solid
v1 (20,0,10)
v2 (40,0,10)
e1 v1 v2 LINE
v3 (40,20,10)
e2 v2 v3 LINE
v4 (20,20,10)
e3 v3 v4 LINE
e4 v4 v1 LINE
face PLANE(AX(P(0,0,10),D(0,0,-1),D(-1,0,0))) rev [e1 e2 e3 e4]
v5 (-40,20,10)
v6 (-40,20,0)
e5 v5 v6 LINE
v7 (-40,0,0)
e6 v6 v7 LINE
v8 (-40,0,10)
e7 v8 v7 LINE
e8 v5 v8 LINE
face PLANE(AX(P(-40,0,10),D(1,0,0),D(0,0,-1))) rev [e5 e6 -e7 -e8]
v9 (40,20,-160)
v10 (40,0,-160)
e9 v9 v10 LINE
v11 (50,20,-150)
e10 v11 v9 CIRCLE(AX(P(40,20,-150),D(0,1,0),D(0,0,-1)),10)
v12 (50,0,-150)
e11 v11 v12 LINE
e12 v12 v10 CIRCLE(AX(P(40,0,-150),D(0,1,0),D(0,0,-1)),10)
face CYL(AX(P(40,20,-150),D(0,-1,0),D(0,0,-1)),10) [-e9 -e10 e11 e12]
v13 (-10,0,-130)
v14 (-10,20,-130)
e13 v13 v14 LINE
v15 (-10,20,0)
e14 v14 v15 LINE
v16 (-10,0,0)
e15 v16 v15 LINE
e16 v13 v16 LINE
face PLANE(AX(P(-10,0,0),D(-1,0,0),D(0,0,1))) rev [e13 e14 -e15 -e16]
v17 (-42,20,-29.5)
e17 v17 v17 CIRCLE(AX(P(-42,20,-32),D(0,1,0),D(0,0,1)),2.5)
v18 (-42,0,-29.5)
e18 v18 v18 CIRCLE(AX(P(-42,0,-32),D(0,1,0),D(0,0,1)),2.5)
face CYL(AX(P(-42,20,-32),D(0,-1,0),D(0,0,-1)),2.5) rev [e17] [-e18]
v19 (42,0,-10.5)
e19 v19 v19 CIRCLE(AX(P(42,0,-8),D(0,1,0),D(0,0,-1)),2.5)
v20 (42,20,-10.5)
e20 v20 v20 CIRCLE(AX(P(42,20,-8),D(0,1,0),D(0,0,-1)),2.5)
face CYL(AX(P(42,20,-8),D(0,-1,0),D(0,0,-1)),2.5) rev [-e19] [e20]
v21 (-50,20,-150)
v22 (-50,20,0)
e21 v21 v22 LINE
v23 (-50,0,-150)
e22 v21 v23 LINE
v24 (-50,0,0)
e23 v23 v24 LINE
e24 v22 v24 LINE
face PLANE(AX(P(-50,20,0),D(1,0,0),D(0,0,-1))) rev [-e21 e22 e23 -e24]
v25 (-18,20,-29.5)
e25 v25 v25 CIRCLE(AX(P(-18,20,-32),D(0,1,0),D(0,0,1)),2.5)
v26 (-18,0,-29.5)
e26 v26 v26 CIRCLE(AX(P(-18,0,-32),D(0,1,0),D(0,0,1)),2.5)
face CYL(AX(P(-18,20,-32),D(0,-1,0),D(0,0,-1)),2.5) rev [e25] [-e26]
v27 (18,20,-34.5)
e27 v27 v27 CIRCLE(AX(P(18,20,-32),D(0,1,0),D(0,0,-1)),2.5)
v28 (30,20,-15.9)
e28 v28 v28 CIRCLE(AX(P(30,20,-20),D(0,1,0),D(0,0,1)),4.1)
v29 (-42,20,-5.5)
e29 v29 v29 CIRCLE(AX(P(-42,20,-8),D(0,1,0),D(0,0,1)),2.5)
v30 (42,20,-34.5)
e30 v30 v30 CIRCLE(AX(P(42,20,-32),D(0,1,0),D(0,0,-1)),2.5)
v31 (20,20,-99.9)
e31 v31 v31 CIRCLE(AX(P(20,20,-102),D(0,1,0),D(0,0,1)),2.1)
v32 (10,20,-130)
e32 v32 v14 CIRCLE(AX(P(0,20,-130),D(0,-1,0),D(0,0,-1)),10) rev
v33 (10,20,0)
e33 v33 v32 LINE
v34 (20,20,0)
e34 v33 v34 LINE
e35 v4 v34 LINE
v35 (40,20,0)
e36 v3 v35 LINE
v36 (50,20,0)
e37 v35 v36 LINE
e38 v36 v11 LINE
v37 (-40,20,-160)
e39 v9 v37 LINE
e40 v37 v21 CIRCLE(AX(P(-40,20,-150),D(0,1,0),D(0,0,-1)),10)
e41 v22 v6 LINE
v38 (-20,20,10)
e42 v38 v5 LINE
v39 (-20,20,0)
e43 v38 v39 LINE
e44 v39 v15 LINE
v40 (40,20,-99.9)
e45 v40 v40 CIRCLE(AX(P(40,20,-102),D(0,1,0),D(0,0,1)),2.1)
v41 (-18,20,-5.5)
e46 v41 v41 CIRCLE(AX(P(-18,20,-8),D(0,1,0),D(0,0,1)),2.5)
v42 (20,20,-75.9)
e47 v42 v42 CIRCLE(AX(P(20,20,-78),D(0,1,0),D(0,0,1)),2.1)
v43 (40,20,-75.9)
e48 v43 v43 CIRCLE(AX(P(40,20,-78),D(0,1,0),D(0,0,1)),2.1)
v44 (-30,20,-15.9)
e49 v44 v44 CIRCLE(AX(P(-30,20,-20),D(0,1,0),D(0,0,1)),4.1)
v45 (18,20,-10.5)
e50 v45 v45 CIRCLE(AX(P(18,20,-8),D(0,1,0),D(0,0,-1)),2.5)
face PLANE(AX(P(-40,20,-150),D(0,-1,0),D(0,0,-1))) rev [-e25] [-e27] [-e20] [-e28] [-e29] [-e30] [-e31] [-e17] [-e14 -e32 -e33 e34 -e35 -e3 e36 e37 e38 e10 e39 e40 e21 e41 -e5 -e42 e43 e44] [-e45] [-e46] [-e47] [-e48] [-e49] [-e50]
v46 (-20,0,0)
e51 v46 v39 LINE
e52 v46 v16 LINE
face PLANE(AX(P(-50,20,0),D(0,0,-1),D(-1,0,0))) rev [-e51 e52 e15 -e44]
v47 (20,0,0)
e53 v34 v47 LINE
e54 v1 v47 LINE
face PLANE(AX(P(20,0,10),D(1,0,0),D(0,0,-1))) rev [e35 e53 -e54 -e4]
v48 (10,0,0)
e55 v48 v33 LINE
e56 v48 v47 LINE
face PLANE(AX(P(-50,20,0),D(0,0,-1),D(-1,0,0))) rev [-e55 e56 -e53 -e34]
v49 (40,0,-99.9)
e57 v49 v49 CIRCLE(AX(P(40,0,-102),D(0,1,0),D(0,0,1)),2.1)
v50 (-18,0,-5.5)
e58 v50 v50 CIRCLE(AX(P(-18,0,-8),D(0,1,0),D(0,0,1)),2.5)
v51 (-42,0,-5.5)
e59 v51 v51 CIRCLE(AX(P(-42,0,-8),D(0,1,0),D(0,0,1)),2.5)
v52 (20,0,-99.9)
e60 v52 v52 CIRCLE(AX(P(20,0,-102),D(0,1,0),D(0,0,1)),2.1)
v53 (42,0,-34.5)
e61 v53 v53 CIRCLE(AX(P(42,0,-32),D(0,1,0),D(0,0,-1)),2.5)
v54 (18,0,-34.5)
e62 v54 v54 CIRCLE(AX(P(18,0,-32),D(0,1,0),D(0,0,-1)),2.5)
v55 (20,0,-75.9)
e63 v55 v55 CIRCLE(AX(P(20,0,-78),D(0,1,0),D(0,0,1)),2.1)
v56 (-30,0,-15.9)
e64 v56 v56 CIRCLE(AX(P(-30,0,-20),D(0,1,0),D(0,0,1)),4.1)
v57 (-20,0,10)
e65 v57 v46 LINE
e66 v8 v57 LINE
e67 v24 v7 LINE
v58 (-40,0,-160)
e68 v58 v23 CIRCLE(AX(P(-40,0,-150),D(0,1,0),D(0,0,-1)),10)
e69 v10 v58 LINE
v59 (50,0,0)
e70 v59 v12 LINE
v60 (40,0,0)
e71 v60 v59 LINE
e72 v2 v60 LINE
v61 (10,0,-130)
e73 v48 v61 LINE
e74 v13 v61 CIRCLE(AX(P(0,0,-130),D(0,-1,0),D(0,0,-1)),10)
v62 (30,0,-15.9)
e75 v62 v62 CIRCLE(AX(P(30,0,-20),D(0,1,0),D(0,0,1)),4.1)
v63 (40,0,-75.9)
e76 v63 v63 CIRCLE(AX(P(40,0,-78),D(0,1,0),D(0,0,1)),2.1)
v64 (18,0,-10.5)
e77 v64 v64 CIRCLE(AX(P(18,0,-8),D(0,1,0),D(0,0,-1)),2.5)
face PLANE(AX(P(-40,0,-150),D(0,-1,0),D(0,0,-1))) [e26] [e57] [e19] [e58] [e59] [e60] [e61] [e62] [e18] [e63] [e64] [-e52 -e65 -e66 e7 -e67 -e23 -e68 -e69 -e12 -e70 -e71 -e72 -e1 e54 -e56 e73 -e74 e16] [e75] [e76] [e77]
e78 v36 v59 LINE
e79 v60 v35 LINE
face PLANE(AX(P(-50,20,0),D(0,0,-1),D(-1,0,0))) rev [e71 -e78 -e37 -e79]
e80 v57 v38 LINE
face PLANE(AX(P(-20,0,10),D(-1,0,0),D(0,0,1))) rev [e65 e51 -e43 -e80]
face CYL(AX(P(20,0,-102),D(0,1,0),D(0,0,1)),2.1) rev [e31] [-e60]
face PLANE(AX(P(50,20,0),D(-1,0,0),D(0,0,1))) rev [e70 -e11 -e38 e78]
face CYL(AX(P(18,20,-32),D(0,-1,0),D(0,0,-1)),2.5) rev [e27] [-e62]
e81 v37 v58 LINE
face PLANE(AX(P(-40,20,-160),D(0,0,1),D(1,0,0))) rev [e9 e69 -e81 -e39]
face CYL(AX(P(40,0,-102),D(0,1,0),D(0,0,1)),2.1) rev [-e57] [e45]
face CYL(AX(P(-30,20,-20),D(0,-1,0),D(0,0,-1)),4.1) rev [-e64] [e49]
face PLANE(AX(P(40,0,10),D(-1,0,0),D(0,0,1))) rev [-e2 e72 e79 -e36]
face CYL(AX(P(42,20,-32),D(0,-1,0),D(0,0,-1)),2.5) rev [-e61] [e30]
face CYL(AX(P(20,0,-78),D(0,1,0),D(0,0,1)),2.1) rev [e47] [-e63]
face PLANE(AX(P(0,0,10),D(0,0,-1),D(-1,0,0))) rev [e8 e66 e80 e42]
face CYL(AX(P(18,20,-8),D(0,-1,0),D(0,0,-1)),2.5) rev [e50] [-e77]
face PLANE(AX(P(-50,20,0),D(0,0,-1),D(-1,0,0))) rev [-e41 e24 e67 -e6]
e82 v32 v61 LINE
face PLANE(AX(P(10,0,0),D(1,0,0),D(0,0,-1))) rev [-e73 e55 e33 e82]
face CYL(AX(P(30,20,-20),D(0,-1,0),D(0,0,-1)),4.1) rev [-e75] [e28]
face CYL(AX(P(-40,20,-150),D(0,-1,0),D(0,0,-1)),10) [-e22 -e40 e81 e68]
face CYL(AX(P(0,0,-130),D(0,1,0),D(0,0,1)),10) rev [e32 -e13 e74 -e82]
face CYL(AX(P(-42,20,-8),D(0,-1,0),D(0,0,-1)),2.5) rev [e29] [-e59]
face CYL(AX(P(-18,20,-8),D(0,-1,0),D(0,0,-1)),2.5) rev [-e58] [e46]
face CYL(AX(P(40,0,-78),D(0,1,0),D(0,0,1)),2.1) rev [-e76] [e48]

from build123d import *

# Parameters (mm, degrees)
SKETCH_1_R          = 4.1
SKETCH_1_R_2        = 2.5
EXTRUDE_1_DEPTH     = 20
SKETCH_2_W          = 20
SKETCH_2_H          = 140
CUT_EXTRUDE_1_DEPTH = 169.819430161
FILLET_1_R          = 10
SKETCH_3_W          = 20
SKETCH_3_H          = 20
EXTRUDE_2_DEPTH     = 10
SKETCH_4_W          = 20
SKETCH_4_H          = 20
EXTRUDE_3_DEPTH     = 10
SKETCH_5_R          = 2.1
CUT_EXTRUDE_2_DEPTH = 169.819430161


with BuildPart() as part:
    # ｽｹｯﾁ1 → ﾎﾞｽ - 押し出し1 (new body)
    with BuildSketch(Plane(origin=(0, 0, 0), x_dir=(1, 0, 0), z_dir=(0, 1, 0))):
        with BuildLine():
            Line((-50, 0), (50, 0))
            Line((50, 0), (50, 150))
            ThreePointArc((50, 150), (47.071067812, 157.071067812), (40, 160))
            Line((40, 160), (-40, 160))
            ThreePointArc((-40, 160), (-47.071067812, 157.071067812), (-50, 150))
            Line((-50, 150), (-50, 0))
        make_face()
        with Locations(Location((-30, 20, 0), (0, 0, 270))):
            Circle(SKETCH_1_R, mode=Mode.SUBTRACT)
        with Locations(Location((30, 20, 0), (0, 0, 270))):
            Circle(SKETCH_1_R, mode=Mode.SUBTRACT)
        with Locations(Location((-42, 32, 0), (0, 0, 270))):
            Circle(SKETCH_1_R_2, mode=Mode.SUBTRACT)
        with Locations(Location((-18, 32, 0), (0, 0, 270))):
            Circle(SKETCH_1_R_2, mode=Mode.SUBTRACT)
        with Locations(Location((-18, 8, 0), (0, 0, 270))):
            Circle(SKETCH_1_R_2, mode=Mode.SUBTRACT)
        with Locations(Location((-42, 8, 0), (0, 0, 270))):
            Circle(SKETCH_1_R_2, mode=Mode.SUBTRACT)
        with Locations(Location((18, 32, 0), (0, 0, 90))):
            Circle(SKETCH_1_R_2, mode=Mode.SUBTRACT)
        with Locations(Location((18, 8, 0), (0, 0, 90))):
            Circle(SKETCH_1_R_2, mode=Mode.SUBTRACT)
        with Locations(Location((42, 8, 0), (0, 0, 90))):
            Circle(SKETCH_1_R_2, mode=Mode.SUBTRACT)
        with Locations(Location((42, 32, 0), (0, 0, 90))):
            Circle(SKETCH_1_R_2, mode=Mode.SUBTRACT)
    extrude(amount=EXTRUDE_1_DEPTH)

    # ｽｹｯﾁ2 → ｶｯﾄ - 押し出し1 (cut, through all)
    with BuildSketch(Plane(origin=(0, 20, 0), x_dir=(1, 0, 0), z_dir=(0, 1, 0))):
        with Locations((0, 70)):
            Rectangle(SKETCH_2_W, SKETCH_2_H)
    extrude(amount=-CUT_EXTRUDE_1_DEPTH, mode=Mode.SUBTRACT)

    # ﾌｨﾚｯﾄ1
    fillet_1_edges = [part.edges().sort_by_distance(p)[0] for p in [
        (-10, 10, -140),
        (10, 10, -140),
    ]]
    fillet(fillet_1_edges, radius=FILLET_1_R - 0.0001)  # a hair under: the kernel refuses the full size

    # ｽｹｯﾁ3 → ﾎﾞｽ - 押し出し2 (add)
    with BuildSketch(Plane.XY):
        with Locations((30, 10)):
            Rectangle(SKETCH_3_W, SKETCH_3_H)
    extrude(amount=EXTRUDE_2_DEPTH)

    # ｽｹｯﾁ4 → ﾎﾞｽ - 押し出し3 (add)
    with BuildSketch(Plane.XY):
        with Locations((-30, 10)):
            Rectangle(SKETCH_4_W, SKETCH_4_H)
    extrude(amount=EXTRUDE_3_DEPTH)

    # ｽｹｯﾁ5 → ｶｯﾄ - 押し出し2 (cut, through all)
    with BuildSketch(Plane(origin=(0, 20, 0), x_dir=(1, 0, 0), z_dir=(0, 1, 0))):
        with Locations(Location((20, 102, 0), (0, 0, 270))):
            Circle(SKETCH_5_R)
        with Locations(Location((40, 102, 0), (0, 0, 270))):
            Circle(SKETCH_5_R)
        with Locations(Location((20, 78, 0), (0, 0, 270))):
            Circle(SKETCH_5_R)
        with Locations(Location((40, 78, 0), (0, 0, 270))):
            Circle(SKETCH_5_R)
    extrude(amount=-CUT_EXTRUDE_2_DEPTH, mode=Mode.SUBTRACT)


solid = part.part
